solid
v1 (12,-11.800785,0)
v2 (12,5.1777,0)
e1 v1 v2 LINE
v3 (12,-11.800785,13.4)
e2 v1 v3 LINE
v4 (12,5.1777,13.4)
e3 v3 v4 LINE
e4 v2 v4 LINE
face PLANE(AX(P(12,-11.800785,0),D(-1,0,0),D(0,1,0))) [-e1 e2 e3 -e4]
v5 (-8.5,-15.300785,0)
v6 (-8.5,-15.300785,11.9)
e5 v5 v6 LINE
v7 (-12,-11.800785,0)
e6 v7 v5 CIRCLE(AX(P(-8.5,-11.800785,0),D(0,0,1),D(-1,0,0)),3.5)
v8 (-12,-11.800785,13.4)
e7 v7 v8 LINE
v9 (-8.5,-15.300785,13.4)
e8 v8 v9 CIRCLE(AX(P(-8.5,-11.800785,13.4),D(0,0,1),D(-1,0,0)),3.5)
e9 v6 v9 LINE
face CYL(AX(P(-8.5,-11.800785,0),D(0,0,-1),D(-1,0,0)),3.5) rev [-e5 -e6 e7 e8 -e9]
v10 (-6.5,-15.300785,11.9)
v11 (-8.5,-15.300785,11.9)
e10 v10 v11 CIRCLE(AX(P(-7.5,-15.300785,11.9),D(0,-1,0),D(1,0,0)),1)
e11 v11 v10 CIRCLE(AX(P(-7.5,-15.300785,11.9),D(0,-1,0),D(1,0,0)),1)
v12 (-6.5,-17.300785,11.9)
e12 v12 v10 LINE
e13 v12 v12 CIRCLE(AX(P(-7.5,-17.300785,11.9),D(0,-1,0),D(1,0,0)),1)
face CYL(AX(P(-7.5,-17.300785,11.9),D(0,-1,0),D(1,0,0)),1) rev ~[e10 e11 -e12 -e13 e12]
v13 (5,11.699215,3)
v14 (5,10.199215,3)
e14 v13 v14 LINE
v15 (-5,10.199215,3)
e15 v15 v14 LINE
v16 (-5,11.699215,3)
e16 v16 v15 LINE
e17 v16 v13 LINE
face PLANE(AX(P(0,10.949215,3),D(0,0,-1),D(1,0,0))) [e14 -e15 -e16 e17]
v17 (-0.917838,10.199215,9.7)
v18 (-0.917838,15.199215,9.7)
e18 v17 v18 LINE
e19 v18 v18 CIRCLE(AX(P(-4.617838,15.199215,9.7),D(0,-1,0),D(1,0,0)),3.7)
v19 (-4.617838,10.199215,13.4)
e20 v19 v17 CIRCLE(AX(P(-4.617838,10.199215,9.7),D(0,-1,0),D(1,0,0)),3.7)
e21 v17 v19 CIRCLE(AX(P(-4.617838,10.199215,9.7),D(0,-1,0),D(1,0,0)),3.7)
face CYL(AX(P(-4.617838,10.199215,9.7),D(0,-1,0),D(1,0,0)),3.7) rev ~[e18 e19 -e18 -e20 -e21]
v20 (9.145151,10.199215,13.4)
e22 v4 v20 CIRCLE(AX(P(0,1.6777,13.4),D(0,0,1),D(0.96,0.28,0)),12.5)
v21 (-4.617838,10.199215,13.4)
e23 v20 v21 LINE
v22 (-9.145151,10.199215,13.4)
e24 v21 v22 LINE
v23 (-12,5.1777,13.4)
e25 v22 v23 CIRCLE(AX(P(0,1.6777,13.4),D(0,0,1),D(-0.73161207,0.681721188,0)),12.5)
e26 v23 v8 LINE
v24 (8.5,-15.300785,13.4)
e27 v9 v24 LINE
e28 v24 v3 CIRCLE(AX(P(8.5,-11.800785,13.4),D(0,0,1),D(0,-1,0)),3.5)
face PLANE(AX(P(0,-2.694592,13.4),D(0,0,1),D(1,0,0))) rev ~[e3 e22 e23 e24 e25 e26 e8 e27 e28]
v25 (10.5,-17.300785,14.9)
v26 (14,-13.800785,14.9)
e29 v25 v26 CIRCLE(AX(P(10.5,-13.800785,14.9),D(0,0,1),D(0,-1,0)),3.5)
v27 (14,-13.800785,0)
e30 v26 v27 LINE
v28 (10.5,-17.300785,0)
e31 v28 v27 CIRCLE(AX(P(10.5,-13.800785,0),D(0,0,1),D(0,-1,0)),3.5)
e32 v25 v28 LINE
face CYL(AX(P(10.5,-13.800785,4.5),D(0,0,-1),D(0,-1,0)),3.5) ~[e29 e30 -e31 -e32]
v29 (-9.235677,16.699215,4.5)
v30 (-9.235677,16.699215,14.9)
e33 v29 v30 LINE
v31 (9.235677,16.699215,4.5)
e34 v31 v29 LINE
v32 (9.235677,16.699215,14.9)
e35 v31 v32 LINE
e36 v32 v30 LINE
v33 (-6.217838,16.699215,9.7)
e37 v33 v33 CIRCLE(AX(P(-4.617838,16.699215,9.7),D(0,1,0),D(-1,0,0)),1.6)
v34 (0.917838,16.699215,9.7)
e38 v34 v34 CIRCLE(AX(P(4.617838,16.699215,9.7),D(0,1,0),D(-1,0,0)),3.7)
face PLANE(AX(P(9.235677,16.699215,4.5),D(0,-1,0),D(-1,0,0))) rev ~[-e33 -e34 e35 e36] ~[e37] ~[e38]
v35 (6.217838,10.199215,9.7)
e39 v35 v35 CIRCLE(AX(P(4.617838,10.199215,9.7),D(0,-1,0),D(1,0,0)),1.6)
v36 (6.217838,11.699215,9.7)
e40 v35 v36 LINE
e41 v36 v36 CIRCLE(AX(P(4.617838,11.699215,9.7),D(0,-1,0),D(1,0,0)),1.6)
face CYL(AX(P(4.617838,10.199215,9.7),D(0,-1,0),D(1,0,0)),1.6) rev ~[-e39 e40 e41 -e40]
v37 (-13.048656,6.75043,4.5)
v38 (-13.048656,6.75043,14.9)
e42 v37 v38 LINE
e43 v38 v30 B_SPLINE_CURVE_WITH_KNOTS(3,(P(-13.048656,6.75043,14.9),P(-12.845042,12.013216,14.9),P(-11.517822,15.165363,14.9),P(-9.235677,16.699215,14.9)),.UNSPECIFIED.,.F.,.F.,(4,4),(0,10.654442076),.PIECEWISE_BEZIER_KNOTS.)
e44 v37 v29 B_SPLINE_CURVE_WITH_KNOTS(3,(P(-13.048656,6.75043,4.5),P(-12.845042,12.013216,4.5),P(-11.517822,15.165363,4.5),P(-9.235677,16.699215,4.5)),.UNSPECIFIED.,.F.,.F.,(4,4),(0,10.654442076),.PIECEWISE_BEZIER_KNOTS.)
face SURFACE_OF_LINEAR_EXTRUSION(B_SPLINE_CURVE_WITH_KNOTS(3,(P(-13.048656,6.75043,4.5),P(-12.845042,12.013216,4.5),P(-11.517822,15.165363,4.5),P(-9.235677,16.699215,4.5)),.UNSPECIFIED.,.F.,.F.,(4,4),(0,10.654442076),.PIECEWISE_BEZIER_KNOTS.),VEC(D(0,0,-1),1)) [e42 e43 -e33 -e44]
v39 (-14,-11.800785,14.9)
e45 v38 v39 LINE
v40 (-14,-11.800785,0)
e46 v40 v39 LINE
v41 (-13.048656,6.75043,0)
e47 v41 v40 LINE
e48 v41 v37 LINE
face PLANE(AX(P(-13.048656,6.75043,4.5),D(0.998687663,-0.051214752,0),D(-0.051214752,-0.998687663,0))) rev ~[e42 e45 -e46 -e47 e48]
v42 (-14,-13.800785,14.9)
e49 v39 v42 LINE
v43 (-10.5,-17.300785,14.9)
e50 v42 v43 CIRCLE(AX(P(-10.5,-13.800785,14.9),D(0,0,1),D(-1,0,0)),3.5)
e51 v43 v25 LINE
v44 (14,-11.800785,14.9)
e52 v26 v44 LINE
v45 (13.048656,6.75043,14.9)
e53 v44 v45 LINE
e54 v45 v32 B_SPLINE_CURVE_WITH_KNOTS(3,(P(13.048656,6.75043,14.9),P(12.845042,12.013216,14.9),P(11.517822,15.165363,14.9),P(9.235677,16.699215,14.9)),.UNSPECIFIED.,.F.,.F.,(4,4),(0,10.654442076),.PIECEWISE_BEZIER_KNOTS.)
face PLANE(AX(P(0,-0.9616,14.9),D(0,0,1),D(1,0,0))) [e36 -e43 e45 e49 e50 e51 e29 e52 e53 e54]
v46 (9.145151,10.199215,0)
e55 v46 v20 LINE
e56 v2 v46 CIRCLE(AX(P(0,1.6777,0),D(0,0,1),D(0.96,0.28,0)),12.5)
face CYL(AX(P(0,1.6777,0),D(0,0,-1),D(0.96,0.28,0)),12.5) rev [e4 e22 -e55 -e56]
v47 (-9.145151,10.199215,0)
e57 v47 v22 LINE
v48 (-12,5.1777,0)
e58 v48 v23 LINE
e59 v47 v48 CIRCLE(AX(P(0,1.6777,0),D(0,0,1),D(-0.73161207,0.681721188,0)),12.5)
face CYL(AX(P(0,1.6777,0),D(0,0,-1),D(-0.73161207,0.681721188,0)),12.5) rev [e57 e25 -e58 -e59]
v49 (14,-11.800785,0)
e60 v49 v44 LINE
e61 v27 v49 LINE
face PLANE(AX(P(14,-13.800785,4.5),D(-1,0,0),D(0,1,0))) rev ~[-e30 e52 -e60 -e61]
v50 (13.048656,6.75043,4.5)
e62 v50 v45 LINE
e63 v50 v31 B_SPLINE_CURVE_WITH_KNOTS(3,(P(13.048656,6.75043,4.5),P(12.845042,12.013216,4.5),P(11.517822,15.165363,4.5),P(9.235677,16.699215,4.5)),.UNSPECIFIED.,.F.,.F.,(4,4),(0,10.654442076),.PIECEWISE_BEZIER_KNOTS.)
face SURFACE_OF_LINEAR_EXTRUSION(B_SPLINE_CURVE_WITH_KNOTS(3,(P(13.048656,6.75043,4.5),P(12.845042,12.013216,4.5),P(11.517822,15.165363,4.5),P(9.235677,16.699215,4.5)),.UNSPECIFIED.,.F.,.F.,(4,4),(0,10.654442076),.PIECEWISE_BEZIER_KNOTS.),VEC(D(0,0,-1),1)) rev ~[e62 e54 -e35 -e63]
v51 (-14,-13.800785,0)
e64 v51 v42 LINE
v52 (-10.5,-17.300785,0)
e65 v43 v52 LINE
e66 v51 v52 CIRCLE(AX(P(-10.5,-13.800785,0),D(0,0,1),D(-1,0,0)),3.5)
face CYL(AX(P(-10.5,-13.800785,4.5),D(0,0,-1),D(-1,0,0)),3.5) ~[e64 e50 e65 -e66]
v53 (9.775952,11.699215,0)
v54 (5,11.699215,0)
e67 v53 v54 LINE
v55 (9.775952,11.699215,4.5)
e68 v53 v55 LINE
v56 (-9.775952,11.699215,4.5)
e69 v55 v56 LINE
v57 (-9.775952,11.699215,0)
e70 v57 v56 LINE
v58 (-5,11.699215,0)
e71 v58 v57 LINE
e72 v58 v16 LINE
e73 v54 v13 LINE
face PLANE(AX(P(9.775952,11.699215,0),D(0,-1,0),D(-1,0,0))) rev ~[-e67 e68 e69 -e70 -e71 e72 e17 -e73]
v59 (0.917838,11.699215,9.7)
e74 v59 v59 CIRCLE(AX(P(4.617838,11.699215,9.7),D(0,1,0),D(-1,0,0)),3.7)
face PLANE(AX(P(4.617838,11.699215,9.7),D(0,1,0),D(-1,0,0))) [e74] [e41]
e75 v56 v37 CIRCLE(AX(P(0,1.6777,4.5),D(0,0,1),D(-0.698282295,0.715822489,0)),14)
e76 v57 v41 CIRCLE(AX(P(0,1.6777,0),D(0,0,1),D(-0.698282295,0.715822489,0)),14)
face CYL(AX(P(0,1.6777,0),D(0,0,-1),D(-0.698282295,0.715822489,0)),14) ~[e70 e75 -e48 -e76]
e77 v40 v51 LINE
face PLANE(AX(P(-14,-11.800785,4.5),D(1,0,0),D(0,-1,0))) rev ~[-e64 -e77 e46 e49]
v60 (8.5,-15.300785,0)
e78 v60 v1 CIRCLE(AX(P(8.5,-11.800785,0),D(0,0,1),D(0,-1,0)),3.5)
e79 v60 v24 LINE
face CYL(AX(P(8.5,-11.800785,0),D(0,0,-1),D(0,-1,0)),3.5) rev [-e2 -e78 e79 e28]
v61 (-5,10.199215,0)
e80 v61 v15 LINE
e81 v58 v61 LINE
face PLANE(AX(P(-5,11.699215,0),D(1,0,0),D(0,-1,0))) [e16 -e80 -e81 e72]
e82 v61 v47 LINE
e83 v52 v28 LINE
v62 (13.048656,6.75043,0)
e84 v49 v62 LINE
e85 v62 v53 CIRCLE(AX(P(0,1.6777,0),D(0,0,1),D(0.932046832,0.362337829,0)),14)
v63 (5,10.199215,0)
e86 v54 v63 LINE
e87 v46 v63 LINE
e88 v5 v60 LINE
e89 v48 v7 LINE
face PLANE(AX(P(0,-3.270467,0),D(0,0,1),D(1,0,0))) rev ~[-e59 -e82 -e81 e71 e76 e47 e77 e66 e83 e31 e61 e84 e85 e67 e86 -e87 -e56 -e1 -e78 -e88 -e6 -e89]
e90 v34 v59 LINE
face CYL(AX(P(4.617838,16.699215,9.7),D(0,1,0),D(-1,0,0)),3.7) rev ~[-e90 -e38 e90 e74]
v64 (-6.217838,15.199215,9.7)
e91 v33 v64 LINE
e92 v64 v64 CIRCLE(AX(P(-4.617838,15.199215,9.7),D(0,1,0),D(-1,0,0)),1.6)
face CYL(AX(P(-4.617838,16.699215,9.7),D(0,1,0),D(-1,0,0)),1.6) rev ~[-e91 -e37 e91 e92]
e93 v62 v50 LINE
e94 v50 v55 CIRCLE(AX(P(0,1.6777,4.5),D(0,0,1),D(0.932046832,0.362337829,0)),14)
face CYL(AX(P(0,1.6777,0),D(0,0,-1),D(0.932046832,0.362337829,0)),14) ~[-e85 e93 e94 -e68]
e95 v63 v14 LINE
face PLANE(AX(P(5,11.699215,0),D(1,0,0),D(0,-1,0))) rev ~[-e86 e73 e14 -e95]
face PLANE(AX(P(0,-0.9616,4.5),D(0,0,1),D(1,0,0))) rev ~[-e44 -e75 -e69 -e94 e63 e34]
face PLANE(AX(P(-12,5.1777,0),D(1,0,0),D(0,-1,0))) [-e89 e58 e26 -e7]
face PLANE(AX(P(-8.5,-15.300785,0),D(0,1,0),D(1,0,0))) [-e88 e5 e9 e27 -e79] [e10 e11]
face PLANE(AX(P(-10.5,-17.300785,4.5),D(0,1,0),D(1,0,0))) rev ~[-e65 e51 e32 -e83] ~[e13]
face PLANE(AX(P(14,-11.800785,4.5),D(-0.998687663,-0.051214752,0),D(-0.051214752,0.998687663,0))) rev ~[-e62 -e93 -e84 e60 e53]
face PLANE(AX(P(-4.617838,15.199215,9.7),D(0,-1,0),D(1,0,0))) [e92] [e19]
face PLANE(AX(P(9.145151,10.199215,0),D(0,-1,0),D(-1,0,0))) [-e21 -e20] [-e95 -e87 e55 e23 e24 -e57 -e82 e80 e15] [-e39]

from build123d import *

# Parameters (mm, degrees)
F1_DEPTH  = 4.5
F3_DEPTH  = 10.4
F5_DEPTH  = 13.4
F6_R      = 3.7
F6_R_2    = 1.6
F7_DEPTH  = 5
F8_R      = 1.6
F8_R_2    = 3.7
F9_DEPTH  = 5
F10_R     = 1
F11_DEPTH = 2
F12_W     = 10
F12_H     = 1.5
F13_DEPTH = 3


with BuildPart() as f1:
    # F0 (on Top) → F1 (new body)
    with BuildSketch(Plane.XY):
        with BuildLine():
            ThreePointArc((-14, -13.8007847667), (-12.9748737342, -16.2756585008), (-10.5, -17.3007847667))
            Line((-10.5, -17.3007847667), (-6.75, -17.3007847667))
            Line((-6.75, -17.3007847667), (6.75, -17.3007847667))
            Line((6.75, -17.3007847667), (10.5, -17.3007847667))
            ThreePointArc((10.5, -17.3007847667), (12.9748737342, -16.2756585008), (14, -13.8007847667))
            Line((14, -13.8007847667), (14, -11.8007847667))
            Line((14, -11.8007847667), (13.0486556537, 6.7504299853))
            ThreePointArc((13.0486556537, 6.7504299853), (11.6774697173, 9.4001806183), (9.7759521317, 11.6992152333))
            Line((9.7759521317, 11.6992152333), (-9.7759521317, 11.6992152333))
            ThreePointArc((-9.7759521317, 11.6992152333), (-11.6774697173, 9.4001806183), (-13.0486556537, 6.7504299853))
            Line((-13.0486556537, 6.7504299853), (-14, -11.8007847667))
            Line((-14, -11.8007847667), (-14, -13.8007847667))
        make_face()
    extrude(amount=F1_DEPTH)

    # F2 (on face) → F3 (join)
    with BuildSketch(Plane.XY.offset(4.5)):
        with BuildLine():
            Line((14, -13.8007847667), (14, -11.8007847667))
            Line((14, -11.8007847667), (13.0486556537, 6.7504299853))
            add(Edge.make_bspline(
                [(13.0486556537, 6.7504299853), (12.8450421616, 12.0132155716), (11.5178218111, 15.1653625071), (9.2356767608, 16.6992152333)],
                knots=[0, 0, 0, 0, 10.6544420759, 10.6544420759, 10.6544420759, 10.6544420759], degree=3))
            Line((9.2356767608, 16.6992152333), (-9.2356767608, 16.6992152333))
            add(Edge.make_bspline(
                [(-13.0486556537, 6.7504299853), (-12.8450421616, 12.0132155716), (-11.5178218111, 15.1653625071), (-9.2356767608, 16.6992152333)],
                knots=[0, 0, 0, 0, 10.6544420759, 10.6544420759, 10.6544420759, 10.6544420759], degree=3))
            Line((-13.0486556537, 6.7504299853), (-14, -11.8007847667))
            Line((-14, -11.8007847667), (-14, -13.8007847667))
            ThreePointArc((-14, -13.8007847667), (-12.9748737342, -16.2756585008), (-10.5, -17.3007847667))
            Line((-10.5, -17.3007847667), (10.5, -17.3007847667))
            ThreePointArc((10.5, -17.3007847667), (12.9748737342, -16.2756585008), (14, -13.8007847667))
        make_face()
    extrude(amount=F3_DEPTH)

    # F4 (on face) → F5 (cut)
    with BuildSketch(Plane.XY):
        with BuildLine():
            Line((0, -15.3007847667), (8.5, -15.3007847667))
            ThreePointArc((8.5, -15.3007847667), (10.9748737342, -14.2756585008), (12, -11.8007847667))
            Line((12, -11.8007847667), (12, 5.1777003818))
            ThreePointArc((12, 5.1777003818), (10.8666119051, 7.8556244429), (9.145150881, 10.1992152333))
            Line((9.145150881, 10.1992152333), (-9.145150881, 10.1992152333))
            ThreePointArc((-9.145150881, 10.1992152333), (-10.8666119051, 7.8556244429), (-12, 5.1777003818))
            Line((-12, 5.1777003818), (-12, -11.8007847667))
            ThreePointArc((-12, -11.8007847667), (-10.9748737342, -14.2756585008), (-8.5, -15.3007847667))
            Line((-8.5, -15.3007847667), (0, -15.3007847667))
        make_face()
    extrude(amount=F5_DEPTH, mode=Mode.SUBTRACT)

    # F6 (on face) → F7 (cut)
    with BuildSketch(Plane(origin=(0, 16.6992152333, 0), x_dir=(-1, 0, 0), z_dir=(0, 1, 0))):
        with Locations((-4.6178383804, 9.7)):
            Circle(F6_R)
        with Locations((4.6178383804, 9.7)):
            Circle(F6_R_2)
    extrude(amount=-F7_DEPTH, mode=Mode.SUBTRACT)

    # F8 (on face) → F9 (cut)
    with BuildSketch(Plane.XZ.offset(-10.1992152333)):
        with Locations((4.6178383804, 9.7)):
            Circle(F8_R)
        with Locations((-4.6178383804, 9.7)):
            Circle(F8_R_2)
    extrude(amount=-F9_DEPTH, mode=Mode.SUBTRACT)

    # F10 (on face) → F11 (cut, through all)
    with BuildSketch(Plane.XZ.offset(17.3007847667)):
        with Locations((-7.5, 11.9)):
            Circle(F10_R)
    extrude(amount=-F11_DEPTH, mode=Mode.SUBTRACT)

    # F12 (on face) → F13 (cut)
    with BuildSketch(Plane(origin=(0, 0, 0), x_dir=(1, 0, 0), z_dir=(0, 0, -1))):
        with Locations((0, -10.9492152333)):
            Rectangle(F12_W, F12_H)
    extrude(amount=-F13_DEPTH, mode=Mode.SUBTRACT)


solid = f1.part
